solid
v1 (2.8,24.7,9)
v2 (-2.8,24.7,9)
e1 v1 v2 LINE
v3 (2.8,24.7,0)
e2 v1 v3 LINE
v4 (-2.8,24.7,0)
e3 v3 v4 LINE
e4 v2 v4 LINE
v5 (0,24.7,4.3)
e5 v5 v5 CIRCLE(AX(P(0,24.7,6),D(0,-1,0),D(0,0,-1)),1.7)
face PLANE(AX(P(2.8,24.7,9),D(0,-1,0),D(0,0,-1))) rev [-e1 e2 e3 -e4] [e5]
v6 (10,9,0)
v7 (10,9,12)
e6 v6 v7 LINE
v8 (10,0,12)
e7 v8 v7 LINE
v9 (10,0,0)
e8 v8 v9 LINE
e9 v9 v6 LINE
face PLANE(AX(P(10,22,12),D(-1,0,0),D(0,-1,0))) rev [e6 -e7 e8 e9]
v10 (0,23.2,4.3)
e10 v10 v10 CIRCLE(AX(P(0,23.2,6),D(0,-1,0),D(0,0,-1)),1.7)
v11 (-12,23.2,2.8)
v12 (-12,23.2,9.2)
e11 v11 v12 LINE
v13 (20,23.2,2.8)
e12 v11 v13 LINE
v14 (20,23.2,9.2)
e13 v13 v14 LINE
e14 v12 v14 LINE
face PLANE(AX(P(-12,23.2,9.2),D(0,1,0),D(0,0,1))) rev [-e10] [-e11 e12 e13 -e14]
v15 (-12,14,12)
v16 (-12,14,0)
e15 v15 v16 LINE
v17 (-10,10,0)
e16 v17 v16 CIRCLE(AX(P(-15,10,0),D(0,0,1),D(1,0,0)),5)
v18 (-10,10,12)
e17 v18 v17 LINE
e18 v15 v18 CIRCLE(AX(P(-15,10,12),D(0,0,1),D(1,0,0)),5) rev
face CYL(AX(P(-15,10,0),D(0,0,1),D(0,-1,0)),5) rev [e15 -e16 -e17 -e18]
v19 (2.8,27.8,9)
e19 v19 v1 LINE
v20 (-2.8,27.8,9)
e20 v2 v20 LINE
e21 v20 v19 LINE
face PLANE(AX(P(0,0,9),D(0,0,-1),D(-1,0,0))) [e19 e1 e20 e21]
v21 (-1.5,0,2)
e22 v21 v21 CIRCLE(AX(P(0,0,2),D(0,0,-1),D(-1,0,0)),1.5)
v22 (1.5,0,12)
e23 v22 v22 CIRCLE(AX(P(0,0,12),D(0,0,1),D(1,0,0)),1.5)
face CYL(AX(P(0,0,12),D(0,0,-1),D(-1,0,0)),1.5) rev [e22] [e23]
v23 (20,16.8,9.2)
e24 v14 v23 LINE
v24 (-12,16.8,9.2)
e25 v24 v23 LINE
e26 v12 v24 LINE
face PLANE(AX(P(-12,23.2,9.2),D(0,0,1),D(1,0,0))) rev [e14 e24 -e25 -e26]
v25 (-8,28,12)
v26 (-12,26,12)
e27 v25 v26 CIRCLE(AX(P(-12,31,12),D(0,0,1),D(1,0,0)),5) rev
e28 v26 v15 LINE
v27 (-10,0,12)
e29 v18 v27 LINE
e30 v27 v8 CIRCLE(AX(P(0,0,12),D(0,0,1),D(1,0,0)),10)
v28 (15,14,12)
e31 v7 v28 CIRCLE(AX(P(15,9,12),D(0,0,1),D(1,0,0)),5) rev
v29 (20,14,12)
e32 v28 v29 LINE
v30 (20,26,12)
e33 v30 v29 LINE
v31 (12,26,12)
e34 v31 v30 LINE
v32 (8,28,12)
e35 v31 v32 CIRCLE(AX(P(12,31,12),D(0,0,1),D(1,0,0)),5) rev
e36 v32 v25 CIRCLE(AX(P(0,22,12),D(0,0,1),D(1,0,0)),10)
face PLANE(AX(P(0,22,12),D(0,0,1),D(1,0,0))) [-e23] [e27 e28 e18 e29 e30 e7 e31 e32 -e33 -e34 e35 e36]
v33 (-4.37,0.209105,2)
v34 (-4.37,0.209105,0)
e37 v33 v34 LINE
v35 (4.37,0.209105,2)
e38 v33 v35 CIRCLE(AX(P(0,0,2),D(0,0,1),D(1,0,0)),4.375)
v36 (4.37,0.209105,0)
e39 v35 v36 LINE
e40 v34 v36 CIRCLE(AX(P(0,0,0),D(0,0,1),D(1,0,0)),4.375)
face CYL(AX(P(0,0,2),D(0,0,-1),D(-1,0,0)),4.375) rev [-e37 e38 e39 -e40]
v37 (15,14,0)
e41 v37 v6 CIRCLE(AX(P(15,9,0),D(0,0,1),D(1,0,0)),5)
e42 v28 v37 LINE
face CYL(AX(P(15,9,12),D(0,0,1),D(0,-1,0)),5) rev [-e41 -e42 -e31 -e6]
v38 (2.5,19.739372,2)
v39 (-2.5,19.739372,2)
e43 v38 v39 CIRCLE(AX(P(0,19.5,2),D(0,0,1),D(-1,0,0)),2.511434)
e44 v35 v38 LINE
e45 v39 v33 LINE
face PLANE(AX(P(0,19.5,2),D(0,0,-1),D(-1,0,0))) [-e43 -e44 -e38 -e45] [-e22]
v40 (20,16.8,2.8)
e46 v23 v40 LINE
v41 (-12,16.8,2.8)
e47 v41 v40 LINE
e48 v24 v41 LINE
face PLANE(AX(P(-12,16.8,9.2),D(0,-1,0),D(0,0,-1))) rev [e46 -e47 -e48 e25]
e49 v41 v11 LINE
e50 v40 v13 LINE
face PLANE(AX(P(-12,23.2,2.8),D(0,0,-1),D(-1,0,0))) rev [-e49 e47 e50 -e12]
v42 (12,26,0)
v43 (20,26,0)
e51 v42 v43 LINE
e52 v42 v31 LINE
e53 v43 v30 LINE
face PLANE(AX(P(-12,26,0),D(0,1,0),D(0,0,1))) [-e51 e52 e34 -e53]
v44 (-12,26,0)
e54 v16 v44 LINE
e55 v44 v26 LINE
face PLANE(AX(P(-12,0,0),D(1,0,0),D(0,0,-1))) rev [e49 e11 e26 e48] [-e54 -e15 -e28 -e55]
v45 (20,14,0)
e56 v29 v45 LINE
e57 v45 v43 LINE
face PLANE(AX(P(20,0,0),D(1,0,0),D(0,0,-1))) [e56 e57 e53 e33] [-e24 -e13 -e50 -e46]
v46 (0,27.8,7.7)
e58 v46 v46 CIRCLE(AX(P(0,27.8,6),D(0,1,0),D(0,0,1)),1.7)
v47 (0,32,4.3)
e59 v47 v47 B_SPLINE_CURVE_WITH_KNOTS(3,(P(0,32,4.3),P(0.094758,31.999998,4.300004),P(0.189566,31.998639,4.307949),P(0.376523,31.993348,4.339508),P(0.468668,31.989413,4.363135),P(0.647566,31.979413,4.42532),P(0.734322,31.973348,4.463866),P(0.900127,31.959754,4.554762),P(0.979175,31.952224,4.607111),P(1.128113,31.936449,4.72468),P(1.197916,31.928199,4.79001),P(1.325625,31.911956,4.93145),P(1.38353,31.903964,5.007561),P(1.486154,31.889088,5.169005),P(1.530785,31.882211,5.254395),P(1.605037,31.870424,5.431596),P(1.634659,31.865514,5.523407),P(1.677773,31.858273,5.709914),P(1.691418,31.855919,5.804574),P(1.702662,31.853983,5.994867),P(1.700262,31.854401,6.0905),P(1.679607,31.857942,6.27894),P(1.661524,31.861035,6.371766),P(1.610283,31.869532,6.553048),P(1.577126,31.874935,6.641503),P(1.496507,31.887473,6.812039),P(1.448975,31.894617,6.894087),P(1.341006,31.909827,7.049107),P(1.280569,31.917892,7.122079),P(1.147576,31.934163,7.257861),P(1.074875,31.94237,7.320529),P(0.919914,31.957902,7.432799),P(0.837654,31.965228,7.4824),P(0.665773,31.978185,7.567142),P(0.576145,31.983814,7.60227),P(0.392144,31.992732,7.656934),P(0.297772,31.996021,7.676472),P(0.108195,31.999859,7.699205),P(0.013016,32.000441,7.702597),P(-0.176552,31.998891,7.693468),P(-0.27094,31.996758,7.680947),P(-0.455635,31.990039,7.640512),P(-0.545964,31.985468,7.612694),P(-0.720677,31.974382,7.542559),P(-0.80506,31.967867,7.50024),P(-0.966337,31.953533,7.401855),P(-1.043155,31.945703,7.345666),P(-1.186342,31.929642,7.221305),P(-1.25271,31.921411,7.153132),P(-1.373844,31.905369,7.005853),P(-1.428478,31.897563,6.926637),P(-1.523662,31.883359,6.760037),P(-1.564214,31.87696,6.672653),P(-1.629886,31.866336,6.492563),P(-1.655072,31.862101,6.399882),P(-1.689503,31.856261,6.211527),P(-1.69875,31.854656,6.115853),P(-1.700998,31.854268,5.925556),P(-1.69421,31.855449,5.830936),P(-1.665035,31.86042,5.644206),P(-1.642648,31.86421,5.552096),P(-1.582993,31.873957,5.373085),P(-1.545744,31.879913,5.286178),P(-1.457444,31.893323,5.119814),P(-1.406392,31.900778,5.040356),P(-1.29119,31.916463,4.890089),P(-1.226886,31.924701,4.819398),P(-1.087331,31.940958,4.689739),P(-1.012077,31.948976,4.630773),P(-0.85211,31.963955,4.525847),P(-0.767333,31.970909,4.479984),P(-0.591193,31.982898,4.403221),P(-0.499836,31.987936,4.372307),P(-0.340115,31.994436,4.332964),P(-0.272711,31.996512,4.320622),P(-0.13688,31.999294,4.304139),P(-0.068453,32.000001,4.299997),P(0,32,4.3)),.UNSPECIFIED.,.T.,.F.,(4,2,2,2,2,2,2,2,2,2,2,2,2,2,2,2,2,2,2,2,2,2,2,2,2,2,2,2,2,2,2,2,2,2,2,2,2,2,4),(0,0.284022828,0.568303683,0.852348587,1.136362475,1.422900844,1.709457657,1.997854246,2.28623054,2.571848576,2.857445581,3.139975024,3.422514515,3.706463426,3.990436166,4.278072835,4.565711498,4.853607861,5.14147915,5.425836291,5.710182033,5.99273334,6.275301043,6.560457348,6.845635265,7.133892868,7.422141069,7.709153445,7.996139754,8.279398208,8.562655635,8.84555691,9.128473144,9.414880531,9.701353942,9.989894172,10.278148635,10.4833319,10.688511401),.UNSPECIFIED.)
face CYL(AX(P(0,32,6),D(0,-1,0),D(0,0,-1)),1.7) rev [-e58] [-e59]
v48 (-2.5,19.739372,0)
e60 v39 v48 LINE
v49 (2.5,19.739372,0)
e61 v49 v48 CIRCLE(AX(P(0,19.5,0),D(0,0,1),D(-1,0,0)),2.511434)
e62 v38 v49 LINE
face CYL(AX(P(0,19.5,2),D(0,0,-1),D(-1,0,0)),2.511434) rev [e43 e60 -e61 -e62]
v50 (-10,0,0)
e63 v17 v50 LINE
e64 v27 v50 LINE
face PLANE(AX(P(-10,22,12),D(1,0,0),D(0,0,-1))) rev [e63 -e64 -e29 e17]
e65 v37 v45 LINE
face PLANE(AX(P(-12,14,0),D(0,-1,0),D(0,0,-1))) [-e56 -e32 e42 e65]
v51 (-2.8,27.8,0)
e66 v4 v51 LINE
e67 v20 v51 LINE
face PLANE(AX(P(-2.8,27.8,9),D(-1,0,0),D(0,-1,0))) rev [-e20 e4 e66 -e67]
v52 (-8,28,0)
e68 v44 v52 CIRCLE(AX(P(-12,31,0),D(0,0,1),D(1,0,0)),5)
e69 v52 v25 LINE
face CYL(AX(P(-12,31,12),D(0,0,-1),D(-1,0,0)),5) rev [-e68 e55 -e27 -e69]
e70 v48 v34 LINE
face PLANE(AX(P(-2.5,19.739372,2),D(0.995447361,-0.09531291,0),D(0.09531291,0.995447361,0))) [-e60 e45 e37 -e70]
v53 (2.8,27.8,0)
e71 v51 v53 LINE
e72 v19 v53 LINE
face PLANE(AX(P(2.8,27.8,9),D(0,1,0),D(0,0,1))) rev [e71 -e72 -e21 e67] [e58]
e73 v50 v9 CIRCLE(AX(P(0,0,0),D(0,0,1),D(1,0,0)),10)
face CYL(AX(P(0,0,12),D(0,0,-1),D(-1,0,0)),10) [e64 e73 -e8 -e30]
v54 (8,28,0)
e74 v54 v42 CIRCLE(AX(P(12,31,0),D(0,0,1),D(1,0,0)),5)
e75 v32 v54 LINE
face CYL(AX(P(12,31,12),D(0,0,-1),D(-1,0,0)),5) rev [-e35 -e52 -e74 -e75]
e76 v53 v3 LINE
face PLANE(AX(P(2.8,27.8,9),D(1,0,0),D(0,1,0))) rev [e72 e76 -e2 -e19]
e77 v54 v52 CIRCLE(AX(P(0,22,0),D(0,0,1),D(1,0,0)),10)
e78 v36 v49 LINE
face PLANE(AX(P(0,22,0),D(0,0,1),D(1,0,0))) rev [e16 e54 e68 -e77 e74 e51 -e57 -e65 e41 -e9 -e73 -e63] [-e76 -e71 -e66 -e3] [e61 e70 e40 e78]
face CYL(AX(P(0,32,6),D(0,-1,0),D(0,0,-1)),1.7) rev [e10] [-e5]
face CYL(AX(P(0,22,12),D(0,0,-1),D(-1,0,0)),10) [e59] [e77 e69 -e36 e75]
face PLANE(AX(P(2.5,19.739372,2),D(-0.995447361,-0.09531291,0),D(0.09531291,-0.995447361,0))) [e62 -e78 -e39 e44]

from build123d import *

# Parameters (mm, degrees)
BOSS_EXTRUDE1_DEPTH      = 12
SKETCH4_R                = 1.5
CUT_EXTRUDE2_DEPTH       = 36.60898763
BOSS_EXTRUDE2_DEPTH      = 20
BOSS_EXTRUDE2_DEPTH_BACK = 12
SKETCH7_W                = 12
SKETCH7_H                = 12
CUT_EXTRUDE1_DEPTH       = 2
SKETCH8_W                = 6.4
SKETCH8_H                = 6.4
CUT_EXTRUDE4_DEPTH       = 47.818799643
SKETCH9_W                = 5.6
SKETCH9_H                = 3.1
CUT_EXTRUDE5_DEPTH       = 9
SKETCH10_R               = 1.7
CUT_EXTRUDE6_DEPTH       = 41.573883226
FILLET1_R                = 5


with BuildPart() as part:
    # Sketch1 → Boss-Extrude1 (new body)
    with BuildSketch(Plane.XY):
        with BuildLine():
            Line((10, 22), (10, 0))
            ThreePointArc((10, 0), (0, -10), (-10, 0))
            Line((-10, 0), (-10, 22))
            ThreePointArc((-10, 22), (0, 32), (10, 22))
        make_face()
    extrude(amount=BOSS_EXTRUDE1_DEPTH)

    # Sketch4 → Cut-Extrude2 (cut, through all)
    with BuildSketch(Plane.XY):
        Circle(SKETCH4_R)
    extrude(amount=CUT_EXTRUDE2_DEPTH, mode=Mode.SUBTRACT)

    # Sketch7 → Boss-Extrude2 (add, two sides: drawn at the far end of the back side and taken through both)
    with BuildSketch(Plane(origin=(0, 0, 0), x_dir=(0, 0, -1), z_dir=(1, 0, 0)).offset(-BOSS_EXTRUDE2_DEPTH_BACK)):
        with Locations((-6, 20)):
            Rectangle(SKETCH7_W, SKETCH7_H)
    extrude(amount=BOSS_EXTRUDE2_DEPTH + BOSS_EXTRUDE2_DEPTH_BACK)

    # Sketch2 → Cut-Extrude1 (cut)
    with BuildSketch(Plane.XY):
        with BuildLine():
            Line((-2.5, 19.73937205), (-4.37, 0.209105237))
            ThreePointArc((-4.37, 0.209105237), (-0.209105237, -4.37), (4.37, -0.209105237))
            ThreePointArc((4.37, -0.209105237), (4.375, 0), (4.37, 0.209105237))
            Line((4.37, 0.209105237), (2.5, 19.73937205))
            ThreePointArc((2.5, 19.73937205), (0, 22.01143365), (-2.5, 19.73937205))
        make_face()
    extrude(amount=CUT_EXTRUDE1_DEPTH, mode=Mode.SUBTRACT)

    # Sketch8 → Cut-Extrude4 (cut, through all)
    with BuildSketch(Plane(origin=(20, 0, 0), x_dir=(0, 0, -1), z_dir=(1, 0, 0))):
        with Locations((-6, 20)):
            Rectangle(SKETCH8_W, SKETCH8_H)
    extrude(amount=-CUT_EXTRUDE4_DEPTH, mode=Mode.SUBTRACT)

    # Sketch9 → Cut-Extrude5 (cut)
    with BuildSketch(Plane(origin=(0, 0, 0), x_dir=(-1, 0, 0), z_dir=(0, 0, -1))):
        with Locations((0, 26.25)):
            Rectangle(SKETCH9_W, SKETCH9_H)
    extrude(amount=-CUT_EXTRUDE5_DEPTH, mode=Mode.SUBTRACT)

    # Sketch10 → Cut-Extrude6 (cut, through all)
    with BuildSketch(Plane.XZ.offset(-23.2)):
        with Locations(Location((0, 6, 0), (0, 0, 270))):
            Circle(SKETCH10_R)
    extrude(amount=-CUT_EXTRUDE6_DEPTH, mode=Mode.SUBTRACT)

    # Fillet1
    # the kernel refuses this fillet: 5 mm, written as the material it adds along each edge
    with BuildSketch(Plane(origin=(10, 14, 12), x_dir=(1, 0, 0), z_dir=(0, 0, -1))) as fillet1_piece_1:
        with BuildLine():
            CenterArc((FILLET1_R, FILLET1_R), FILLET1_R, 180, 90)
            Line((0, FILLET1_R), (-FILLET1_R * 0.02, FILLET1_R))
            Line((-FILLET1_R * 0.02, FILLET1_R), (-FILLET1_R * 0.02, -FILLET1_R * 0.02))
            Line((-FILLET1_R * 0.02, -FILLET1_R * 0.02), (FILLET1_R, -FILLET1_R * 0.02))
            Line((FILLET1_R, -FILLET1_R * 0.02), (FILLET1_R, 0))
        make_face()
    extrude(amount=12)
    with BuildSketch(Plane(origin=(-9.16515139, 26, 12), x_dir=(0.5033825030764704, 0.8640636872340298, 0), z_dir=(0, 0, -1))) as fillet1_piece_2:
        with BuildLine():
            CenterArc((2.893305247, -4.966402258), FILLET1_R, 96.645859584, 53.130102354)
            Line((-1.427013189, -2.449489743), (-1.513419558, -2.399151492))
            Line((-1.513419558, -2.399151492), (-0.086406369, 0.05033825))
            Line((-0.086406369, 0.05033825), (0.011573221, 0.099328045))
            ThreePointArc((0.011573221, 0.099328045), (1.157322099, 0.032804516), (2.303070977, 0.099328045))
            Line((2.303070977, 0.099328045), (2.314644198, 0))
        make_face()
    extrude(amount=12)
    with BuildSketch(Plane(origin=(9.16515139, 26, 12), x_dir=(1, 0, 0), z_dir=(0, 0, -1))) as fillet1_piece_3:
        with BuildLine():
            CenterArc((2.83484861, -5), FILLET1_R, 90, 53.130102354)
            Line((-1.16515139, -2), (-1.24515139, -1.94))
            ThreePointArc((-1.24515139, -1.94), (-0.610920886, -0.98348678), (-0.091651514, 0.04))
            Line((-0.091651514, 0.04), (0, 0.1))
            Line((0, 0.1), (2.83484861, 0.1))
            Line((2.83484861, 0.1), (2.83484861, 0))
        make_face()
    extrude(amount=12)
    with BuildSketch(Plane(origin=(-10, 14, 0), x_dir=(-1, 0, 0), z_dir=(0, 0, 1))) as fillet1_piece_4:
        with BuildLine():
            CenterArc((5, 4), FILLET1_R, 180, 53.130102354)
            Line((0, 4), (-0.1, 4))
            Line((-0.1, 4), (-0.1, 0))
            Line((-0.1, 0), (0, -0.1))
            ThreePointArc((0, -0.1), (1, -0.1), (1.94, -0.08))
            Line((1.94, -0.08), (2, 0))
        make_face()
    extrude(amount=12)


solid = part.part
